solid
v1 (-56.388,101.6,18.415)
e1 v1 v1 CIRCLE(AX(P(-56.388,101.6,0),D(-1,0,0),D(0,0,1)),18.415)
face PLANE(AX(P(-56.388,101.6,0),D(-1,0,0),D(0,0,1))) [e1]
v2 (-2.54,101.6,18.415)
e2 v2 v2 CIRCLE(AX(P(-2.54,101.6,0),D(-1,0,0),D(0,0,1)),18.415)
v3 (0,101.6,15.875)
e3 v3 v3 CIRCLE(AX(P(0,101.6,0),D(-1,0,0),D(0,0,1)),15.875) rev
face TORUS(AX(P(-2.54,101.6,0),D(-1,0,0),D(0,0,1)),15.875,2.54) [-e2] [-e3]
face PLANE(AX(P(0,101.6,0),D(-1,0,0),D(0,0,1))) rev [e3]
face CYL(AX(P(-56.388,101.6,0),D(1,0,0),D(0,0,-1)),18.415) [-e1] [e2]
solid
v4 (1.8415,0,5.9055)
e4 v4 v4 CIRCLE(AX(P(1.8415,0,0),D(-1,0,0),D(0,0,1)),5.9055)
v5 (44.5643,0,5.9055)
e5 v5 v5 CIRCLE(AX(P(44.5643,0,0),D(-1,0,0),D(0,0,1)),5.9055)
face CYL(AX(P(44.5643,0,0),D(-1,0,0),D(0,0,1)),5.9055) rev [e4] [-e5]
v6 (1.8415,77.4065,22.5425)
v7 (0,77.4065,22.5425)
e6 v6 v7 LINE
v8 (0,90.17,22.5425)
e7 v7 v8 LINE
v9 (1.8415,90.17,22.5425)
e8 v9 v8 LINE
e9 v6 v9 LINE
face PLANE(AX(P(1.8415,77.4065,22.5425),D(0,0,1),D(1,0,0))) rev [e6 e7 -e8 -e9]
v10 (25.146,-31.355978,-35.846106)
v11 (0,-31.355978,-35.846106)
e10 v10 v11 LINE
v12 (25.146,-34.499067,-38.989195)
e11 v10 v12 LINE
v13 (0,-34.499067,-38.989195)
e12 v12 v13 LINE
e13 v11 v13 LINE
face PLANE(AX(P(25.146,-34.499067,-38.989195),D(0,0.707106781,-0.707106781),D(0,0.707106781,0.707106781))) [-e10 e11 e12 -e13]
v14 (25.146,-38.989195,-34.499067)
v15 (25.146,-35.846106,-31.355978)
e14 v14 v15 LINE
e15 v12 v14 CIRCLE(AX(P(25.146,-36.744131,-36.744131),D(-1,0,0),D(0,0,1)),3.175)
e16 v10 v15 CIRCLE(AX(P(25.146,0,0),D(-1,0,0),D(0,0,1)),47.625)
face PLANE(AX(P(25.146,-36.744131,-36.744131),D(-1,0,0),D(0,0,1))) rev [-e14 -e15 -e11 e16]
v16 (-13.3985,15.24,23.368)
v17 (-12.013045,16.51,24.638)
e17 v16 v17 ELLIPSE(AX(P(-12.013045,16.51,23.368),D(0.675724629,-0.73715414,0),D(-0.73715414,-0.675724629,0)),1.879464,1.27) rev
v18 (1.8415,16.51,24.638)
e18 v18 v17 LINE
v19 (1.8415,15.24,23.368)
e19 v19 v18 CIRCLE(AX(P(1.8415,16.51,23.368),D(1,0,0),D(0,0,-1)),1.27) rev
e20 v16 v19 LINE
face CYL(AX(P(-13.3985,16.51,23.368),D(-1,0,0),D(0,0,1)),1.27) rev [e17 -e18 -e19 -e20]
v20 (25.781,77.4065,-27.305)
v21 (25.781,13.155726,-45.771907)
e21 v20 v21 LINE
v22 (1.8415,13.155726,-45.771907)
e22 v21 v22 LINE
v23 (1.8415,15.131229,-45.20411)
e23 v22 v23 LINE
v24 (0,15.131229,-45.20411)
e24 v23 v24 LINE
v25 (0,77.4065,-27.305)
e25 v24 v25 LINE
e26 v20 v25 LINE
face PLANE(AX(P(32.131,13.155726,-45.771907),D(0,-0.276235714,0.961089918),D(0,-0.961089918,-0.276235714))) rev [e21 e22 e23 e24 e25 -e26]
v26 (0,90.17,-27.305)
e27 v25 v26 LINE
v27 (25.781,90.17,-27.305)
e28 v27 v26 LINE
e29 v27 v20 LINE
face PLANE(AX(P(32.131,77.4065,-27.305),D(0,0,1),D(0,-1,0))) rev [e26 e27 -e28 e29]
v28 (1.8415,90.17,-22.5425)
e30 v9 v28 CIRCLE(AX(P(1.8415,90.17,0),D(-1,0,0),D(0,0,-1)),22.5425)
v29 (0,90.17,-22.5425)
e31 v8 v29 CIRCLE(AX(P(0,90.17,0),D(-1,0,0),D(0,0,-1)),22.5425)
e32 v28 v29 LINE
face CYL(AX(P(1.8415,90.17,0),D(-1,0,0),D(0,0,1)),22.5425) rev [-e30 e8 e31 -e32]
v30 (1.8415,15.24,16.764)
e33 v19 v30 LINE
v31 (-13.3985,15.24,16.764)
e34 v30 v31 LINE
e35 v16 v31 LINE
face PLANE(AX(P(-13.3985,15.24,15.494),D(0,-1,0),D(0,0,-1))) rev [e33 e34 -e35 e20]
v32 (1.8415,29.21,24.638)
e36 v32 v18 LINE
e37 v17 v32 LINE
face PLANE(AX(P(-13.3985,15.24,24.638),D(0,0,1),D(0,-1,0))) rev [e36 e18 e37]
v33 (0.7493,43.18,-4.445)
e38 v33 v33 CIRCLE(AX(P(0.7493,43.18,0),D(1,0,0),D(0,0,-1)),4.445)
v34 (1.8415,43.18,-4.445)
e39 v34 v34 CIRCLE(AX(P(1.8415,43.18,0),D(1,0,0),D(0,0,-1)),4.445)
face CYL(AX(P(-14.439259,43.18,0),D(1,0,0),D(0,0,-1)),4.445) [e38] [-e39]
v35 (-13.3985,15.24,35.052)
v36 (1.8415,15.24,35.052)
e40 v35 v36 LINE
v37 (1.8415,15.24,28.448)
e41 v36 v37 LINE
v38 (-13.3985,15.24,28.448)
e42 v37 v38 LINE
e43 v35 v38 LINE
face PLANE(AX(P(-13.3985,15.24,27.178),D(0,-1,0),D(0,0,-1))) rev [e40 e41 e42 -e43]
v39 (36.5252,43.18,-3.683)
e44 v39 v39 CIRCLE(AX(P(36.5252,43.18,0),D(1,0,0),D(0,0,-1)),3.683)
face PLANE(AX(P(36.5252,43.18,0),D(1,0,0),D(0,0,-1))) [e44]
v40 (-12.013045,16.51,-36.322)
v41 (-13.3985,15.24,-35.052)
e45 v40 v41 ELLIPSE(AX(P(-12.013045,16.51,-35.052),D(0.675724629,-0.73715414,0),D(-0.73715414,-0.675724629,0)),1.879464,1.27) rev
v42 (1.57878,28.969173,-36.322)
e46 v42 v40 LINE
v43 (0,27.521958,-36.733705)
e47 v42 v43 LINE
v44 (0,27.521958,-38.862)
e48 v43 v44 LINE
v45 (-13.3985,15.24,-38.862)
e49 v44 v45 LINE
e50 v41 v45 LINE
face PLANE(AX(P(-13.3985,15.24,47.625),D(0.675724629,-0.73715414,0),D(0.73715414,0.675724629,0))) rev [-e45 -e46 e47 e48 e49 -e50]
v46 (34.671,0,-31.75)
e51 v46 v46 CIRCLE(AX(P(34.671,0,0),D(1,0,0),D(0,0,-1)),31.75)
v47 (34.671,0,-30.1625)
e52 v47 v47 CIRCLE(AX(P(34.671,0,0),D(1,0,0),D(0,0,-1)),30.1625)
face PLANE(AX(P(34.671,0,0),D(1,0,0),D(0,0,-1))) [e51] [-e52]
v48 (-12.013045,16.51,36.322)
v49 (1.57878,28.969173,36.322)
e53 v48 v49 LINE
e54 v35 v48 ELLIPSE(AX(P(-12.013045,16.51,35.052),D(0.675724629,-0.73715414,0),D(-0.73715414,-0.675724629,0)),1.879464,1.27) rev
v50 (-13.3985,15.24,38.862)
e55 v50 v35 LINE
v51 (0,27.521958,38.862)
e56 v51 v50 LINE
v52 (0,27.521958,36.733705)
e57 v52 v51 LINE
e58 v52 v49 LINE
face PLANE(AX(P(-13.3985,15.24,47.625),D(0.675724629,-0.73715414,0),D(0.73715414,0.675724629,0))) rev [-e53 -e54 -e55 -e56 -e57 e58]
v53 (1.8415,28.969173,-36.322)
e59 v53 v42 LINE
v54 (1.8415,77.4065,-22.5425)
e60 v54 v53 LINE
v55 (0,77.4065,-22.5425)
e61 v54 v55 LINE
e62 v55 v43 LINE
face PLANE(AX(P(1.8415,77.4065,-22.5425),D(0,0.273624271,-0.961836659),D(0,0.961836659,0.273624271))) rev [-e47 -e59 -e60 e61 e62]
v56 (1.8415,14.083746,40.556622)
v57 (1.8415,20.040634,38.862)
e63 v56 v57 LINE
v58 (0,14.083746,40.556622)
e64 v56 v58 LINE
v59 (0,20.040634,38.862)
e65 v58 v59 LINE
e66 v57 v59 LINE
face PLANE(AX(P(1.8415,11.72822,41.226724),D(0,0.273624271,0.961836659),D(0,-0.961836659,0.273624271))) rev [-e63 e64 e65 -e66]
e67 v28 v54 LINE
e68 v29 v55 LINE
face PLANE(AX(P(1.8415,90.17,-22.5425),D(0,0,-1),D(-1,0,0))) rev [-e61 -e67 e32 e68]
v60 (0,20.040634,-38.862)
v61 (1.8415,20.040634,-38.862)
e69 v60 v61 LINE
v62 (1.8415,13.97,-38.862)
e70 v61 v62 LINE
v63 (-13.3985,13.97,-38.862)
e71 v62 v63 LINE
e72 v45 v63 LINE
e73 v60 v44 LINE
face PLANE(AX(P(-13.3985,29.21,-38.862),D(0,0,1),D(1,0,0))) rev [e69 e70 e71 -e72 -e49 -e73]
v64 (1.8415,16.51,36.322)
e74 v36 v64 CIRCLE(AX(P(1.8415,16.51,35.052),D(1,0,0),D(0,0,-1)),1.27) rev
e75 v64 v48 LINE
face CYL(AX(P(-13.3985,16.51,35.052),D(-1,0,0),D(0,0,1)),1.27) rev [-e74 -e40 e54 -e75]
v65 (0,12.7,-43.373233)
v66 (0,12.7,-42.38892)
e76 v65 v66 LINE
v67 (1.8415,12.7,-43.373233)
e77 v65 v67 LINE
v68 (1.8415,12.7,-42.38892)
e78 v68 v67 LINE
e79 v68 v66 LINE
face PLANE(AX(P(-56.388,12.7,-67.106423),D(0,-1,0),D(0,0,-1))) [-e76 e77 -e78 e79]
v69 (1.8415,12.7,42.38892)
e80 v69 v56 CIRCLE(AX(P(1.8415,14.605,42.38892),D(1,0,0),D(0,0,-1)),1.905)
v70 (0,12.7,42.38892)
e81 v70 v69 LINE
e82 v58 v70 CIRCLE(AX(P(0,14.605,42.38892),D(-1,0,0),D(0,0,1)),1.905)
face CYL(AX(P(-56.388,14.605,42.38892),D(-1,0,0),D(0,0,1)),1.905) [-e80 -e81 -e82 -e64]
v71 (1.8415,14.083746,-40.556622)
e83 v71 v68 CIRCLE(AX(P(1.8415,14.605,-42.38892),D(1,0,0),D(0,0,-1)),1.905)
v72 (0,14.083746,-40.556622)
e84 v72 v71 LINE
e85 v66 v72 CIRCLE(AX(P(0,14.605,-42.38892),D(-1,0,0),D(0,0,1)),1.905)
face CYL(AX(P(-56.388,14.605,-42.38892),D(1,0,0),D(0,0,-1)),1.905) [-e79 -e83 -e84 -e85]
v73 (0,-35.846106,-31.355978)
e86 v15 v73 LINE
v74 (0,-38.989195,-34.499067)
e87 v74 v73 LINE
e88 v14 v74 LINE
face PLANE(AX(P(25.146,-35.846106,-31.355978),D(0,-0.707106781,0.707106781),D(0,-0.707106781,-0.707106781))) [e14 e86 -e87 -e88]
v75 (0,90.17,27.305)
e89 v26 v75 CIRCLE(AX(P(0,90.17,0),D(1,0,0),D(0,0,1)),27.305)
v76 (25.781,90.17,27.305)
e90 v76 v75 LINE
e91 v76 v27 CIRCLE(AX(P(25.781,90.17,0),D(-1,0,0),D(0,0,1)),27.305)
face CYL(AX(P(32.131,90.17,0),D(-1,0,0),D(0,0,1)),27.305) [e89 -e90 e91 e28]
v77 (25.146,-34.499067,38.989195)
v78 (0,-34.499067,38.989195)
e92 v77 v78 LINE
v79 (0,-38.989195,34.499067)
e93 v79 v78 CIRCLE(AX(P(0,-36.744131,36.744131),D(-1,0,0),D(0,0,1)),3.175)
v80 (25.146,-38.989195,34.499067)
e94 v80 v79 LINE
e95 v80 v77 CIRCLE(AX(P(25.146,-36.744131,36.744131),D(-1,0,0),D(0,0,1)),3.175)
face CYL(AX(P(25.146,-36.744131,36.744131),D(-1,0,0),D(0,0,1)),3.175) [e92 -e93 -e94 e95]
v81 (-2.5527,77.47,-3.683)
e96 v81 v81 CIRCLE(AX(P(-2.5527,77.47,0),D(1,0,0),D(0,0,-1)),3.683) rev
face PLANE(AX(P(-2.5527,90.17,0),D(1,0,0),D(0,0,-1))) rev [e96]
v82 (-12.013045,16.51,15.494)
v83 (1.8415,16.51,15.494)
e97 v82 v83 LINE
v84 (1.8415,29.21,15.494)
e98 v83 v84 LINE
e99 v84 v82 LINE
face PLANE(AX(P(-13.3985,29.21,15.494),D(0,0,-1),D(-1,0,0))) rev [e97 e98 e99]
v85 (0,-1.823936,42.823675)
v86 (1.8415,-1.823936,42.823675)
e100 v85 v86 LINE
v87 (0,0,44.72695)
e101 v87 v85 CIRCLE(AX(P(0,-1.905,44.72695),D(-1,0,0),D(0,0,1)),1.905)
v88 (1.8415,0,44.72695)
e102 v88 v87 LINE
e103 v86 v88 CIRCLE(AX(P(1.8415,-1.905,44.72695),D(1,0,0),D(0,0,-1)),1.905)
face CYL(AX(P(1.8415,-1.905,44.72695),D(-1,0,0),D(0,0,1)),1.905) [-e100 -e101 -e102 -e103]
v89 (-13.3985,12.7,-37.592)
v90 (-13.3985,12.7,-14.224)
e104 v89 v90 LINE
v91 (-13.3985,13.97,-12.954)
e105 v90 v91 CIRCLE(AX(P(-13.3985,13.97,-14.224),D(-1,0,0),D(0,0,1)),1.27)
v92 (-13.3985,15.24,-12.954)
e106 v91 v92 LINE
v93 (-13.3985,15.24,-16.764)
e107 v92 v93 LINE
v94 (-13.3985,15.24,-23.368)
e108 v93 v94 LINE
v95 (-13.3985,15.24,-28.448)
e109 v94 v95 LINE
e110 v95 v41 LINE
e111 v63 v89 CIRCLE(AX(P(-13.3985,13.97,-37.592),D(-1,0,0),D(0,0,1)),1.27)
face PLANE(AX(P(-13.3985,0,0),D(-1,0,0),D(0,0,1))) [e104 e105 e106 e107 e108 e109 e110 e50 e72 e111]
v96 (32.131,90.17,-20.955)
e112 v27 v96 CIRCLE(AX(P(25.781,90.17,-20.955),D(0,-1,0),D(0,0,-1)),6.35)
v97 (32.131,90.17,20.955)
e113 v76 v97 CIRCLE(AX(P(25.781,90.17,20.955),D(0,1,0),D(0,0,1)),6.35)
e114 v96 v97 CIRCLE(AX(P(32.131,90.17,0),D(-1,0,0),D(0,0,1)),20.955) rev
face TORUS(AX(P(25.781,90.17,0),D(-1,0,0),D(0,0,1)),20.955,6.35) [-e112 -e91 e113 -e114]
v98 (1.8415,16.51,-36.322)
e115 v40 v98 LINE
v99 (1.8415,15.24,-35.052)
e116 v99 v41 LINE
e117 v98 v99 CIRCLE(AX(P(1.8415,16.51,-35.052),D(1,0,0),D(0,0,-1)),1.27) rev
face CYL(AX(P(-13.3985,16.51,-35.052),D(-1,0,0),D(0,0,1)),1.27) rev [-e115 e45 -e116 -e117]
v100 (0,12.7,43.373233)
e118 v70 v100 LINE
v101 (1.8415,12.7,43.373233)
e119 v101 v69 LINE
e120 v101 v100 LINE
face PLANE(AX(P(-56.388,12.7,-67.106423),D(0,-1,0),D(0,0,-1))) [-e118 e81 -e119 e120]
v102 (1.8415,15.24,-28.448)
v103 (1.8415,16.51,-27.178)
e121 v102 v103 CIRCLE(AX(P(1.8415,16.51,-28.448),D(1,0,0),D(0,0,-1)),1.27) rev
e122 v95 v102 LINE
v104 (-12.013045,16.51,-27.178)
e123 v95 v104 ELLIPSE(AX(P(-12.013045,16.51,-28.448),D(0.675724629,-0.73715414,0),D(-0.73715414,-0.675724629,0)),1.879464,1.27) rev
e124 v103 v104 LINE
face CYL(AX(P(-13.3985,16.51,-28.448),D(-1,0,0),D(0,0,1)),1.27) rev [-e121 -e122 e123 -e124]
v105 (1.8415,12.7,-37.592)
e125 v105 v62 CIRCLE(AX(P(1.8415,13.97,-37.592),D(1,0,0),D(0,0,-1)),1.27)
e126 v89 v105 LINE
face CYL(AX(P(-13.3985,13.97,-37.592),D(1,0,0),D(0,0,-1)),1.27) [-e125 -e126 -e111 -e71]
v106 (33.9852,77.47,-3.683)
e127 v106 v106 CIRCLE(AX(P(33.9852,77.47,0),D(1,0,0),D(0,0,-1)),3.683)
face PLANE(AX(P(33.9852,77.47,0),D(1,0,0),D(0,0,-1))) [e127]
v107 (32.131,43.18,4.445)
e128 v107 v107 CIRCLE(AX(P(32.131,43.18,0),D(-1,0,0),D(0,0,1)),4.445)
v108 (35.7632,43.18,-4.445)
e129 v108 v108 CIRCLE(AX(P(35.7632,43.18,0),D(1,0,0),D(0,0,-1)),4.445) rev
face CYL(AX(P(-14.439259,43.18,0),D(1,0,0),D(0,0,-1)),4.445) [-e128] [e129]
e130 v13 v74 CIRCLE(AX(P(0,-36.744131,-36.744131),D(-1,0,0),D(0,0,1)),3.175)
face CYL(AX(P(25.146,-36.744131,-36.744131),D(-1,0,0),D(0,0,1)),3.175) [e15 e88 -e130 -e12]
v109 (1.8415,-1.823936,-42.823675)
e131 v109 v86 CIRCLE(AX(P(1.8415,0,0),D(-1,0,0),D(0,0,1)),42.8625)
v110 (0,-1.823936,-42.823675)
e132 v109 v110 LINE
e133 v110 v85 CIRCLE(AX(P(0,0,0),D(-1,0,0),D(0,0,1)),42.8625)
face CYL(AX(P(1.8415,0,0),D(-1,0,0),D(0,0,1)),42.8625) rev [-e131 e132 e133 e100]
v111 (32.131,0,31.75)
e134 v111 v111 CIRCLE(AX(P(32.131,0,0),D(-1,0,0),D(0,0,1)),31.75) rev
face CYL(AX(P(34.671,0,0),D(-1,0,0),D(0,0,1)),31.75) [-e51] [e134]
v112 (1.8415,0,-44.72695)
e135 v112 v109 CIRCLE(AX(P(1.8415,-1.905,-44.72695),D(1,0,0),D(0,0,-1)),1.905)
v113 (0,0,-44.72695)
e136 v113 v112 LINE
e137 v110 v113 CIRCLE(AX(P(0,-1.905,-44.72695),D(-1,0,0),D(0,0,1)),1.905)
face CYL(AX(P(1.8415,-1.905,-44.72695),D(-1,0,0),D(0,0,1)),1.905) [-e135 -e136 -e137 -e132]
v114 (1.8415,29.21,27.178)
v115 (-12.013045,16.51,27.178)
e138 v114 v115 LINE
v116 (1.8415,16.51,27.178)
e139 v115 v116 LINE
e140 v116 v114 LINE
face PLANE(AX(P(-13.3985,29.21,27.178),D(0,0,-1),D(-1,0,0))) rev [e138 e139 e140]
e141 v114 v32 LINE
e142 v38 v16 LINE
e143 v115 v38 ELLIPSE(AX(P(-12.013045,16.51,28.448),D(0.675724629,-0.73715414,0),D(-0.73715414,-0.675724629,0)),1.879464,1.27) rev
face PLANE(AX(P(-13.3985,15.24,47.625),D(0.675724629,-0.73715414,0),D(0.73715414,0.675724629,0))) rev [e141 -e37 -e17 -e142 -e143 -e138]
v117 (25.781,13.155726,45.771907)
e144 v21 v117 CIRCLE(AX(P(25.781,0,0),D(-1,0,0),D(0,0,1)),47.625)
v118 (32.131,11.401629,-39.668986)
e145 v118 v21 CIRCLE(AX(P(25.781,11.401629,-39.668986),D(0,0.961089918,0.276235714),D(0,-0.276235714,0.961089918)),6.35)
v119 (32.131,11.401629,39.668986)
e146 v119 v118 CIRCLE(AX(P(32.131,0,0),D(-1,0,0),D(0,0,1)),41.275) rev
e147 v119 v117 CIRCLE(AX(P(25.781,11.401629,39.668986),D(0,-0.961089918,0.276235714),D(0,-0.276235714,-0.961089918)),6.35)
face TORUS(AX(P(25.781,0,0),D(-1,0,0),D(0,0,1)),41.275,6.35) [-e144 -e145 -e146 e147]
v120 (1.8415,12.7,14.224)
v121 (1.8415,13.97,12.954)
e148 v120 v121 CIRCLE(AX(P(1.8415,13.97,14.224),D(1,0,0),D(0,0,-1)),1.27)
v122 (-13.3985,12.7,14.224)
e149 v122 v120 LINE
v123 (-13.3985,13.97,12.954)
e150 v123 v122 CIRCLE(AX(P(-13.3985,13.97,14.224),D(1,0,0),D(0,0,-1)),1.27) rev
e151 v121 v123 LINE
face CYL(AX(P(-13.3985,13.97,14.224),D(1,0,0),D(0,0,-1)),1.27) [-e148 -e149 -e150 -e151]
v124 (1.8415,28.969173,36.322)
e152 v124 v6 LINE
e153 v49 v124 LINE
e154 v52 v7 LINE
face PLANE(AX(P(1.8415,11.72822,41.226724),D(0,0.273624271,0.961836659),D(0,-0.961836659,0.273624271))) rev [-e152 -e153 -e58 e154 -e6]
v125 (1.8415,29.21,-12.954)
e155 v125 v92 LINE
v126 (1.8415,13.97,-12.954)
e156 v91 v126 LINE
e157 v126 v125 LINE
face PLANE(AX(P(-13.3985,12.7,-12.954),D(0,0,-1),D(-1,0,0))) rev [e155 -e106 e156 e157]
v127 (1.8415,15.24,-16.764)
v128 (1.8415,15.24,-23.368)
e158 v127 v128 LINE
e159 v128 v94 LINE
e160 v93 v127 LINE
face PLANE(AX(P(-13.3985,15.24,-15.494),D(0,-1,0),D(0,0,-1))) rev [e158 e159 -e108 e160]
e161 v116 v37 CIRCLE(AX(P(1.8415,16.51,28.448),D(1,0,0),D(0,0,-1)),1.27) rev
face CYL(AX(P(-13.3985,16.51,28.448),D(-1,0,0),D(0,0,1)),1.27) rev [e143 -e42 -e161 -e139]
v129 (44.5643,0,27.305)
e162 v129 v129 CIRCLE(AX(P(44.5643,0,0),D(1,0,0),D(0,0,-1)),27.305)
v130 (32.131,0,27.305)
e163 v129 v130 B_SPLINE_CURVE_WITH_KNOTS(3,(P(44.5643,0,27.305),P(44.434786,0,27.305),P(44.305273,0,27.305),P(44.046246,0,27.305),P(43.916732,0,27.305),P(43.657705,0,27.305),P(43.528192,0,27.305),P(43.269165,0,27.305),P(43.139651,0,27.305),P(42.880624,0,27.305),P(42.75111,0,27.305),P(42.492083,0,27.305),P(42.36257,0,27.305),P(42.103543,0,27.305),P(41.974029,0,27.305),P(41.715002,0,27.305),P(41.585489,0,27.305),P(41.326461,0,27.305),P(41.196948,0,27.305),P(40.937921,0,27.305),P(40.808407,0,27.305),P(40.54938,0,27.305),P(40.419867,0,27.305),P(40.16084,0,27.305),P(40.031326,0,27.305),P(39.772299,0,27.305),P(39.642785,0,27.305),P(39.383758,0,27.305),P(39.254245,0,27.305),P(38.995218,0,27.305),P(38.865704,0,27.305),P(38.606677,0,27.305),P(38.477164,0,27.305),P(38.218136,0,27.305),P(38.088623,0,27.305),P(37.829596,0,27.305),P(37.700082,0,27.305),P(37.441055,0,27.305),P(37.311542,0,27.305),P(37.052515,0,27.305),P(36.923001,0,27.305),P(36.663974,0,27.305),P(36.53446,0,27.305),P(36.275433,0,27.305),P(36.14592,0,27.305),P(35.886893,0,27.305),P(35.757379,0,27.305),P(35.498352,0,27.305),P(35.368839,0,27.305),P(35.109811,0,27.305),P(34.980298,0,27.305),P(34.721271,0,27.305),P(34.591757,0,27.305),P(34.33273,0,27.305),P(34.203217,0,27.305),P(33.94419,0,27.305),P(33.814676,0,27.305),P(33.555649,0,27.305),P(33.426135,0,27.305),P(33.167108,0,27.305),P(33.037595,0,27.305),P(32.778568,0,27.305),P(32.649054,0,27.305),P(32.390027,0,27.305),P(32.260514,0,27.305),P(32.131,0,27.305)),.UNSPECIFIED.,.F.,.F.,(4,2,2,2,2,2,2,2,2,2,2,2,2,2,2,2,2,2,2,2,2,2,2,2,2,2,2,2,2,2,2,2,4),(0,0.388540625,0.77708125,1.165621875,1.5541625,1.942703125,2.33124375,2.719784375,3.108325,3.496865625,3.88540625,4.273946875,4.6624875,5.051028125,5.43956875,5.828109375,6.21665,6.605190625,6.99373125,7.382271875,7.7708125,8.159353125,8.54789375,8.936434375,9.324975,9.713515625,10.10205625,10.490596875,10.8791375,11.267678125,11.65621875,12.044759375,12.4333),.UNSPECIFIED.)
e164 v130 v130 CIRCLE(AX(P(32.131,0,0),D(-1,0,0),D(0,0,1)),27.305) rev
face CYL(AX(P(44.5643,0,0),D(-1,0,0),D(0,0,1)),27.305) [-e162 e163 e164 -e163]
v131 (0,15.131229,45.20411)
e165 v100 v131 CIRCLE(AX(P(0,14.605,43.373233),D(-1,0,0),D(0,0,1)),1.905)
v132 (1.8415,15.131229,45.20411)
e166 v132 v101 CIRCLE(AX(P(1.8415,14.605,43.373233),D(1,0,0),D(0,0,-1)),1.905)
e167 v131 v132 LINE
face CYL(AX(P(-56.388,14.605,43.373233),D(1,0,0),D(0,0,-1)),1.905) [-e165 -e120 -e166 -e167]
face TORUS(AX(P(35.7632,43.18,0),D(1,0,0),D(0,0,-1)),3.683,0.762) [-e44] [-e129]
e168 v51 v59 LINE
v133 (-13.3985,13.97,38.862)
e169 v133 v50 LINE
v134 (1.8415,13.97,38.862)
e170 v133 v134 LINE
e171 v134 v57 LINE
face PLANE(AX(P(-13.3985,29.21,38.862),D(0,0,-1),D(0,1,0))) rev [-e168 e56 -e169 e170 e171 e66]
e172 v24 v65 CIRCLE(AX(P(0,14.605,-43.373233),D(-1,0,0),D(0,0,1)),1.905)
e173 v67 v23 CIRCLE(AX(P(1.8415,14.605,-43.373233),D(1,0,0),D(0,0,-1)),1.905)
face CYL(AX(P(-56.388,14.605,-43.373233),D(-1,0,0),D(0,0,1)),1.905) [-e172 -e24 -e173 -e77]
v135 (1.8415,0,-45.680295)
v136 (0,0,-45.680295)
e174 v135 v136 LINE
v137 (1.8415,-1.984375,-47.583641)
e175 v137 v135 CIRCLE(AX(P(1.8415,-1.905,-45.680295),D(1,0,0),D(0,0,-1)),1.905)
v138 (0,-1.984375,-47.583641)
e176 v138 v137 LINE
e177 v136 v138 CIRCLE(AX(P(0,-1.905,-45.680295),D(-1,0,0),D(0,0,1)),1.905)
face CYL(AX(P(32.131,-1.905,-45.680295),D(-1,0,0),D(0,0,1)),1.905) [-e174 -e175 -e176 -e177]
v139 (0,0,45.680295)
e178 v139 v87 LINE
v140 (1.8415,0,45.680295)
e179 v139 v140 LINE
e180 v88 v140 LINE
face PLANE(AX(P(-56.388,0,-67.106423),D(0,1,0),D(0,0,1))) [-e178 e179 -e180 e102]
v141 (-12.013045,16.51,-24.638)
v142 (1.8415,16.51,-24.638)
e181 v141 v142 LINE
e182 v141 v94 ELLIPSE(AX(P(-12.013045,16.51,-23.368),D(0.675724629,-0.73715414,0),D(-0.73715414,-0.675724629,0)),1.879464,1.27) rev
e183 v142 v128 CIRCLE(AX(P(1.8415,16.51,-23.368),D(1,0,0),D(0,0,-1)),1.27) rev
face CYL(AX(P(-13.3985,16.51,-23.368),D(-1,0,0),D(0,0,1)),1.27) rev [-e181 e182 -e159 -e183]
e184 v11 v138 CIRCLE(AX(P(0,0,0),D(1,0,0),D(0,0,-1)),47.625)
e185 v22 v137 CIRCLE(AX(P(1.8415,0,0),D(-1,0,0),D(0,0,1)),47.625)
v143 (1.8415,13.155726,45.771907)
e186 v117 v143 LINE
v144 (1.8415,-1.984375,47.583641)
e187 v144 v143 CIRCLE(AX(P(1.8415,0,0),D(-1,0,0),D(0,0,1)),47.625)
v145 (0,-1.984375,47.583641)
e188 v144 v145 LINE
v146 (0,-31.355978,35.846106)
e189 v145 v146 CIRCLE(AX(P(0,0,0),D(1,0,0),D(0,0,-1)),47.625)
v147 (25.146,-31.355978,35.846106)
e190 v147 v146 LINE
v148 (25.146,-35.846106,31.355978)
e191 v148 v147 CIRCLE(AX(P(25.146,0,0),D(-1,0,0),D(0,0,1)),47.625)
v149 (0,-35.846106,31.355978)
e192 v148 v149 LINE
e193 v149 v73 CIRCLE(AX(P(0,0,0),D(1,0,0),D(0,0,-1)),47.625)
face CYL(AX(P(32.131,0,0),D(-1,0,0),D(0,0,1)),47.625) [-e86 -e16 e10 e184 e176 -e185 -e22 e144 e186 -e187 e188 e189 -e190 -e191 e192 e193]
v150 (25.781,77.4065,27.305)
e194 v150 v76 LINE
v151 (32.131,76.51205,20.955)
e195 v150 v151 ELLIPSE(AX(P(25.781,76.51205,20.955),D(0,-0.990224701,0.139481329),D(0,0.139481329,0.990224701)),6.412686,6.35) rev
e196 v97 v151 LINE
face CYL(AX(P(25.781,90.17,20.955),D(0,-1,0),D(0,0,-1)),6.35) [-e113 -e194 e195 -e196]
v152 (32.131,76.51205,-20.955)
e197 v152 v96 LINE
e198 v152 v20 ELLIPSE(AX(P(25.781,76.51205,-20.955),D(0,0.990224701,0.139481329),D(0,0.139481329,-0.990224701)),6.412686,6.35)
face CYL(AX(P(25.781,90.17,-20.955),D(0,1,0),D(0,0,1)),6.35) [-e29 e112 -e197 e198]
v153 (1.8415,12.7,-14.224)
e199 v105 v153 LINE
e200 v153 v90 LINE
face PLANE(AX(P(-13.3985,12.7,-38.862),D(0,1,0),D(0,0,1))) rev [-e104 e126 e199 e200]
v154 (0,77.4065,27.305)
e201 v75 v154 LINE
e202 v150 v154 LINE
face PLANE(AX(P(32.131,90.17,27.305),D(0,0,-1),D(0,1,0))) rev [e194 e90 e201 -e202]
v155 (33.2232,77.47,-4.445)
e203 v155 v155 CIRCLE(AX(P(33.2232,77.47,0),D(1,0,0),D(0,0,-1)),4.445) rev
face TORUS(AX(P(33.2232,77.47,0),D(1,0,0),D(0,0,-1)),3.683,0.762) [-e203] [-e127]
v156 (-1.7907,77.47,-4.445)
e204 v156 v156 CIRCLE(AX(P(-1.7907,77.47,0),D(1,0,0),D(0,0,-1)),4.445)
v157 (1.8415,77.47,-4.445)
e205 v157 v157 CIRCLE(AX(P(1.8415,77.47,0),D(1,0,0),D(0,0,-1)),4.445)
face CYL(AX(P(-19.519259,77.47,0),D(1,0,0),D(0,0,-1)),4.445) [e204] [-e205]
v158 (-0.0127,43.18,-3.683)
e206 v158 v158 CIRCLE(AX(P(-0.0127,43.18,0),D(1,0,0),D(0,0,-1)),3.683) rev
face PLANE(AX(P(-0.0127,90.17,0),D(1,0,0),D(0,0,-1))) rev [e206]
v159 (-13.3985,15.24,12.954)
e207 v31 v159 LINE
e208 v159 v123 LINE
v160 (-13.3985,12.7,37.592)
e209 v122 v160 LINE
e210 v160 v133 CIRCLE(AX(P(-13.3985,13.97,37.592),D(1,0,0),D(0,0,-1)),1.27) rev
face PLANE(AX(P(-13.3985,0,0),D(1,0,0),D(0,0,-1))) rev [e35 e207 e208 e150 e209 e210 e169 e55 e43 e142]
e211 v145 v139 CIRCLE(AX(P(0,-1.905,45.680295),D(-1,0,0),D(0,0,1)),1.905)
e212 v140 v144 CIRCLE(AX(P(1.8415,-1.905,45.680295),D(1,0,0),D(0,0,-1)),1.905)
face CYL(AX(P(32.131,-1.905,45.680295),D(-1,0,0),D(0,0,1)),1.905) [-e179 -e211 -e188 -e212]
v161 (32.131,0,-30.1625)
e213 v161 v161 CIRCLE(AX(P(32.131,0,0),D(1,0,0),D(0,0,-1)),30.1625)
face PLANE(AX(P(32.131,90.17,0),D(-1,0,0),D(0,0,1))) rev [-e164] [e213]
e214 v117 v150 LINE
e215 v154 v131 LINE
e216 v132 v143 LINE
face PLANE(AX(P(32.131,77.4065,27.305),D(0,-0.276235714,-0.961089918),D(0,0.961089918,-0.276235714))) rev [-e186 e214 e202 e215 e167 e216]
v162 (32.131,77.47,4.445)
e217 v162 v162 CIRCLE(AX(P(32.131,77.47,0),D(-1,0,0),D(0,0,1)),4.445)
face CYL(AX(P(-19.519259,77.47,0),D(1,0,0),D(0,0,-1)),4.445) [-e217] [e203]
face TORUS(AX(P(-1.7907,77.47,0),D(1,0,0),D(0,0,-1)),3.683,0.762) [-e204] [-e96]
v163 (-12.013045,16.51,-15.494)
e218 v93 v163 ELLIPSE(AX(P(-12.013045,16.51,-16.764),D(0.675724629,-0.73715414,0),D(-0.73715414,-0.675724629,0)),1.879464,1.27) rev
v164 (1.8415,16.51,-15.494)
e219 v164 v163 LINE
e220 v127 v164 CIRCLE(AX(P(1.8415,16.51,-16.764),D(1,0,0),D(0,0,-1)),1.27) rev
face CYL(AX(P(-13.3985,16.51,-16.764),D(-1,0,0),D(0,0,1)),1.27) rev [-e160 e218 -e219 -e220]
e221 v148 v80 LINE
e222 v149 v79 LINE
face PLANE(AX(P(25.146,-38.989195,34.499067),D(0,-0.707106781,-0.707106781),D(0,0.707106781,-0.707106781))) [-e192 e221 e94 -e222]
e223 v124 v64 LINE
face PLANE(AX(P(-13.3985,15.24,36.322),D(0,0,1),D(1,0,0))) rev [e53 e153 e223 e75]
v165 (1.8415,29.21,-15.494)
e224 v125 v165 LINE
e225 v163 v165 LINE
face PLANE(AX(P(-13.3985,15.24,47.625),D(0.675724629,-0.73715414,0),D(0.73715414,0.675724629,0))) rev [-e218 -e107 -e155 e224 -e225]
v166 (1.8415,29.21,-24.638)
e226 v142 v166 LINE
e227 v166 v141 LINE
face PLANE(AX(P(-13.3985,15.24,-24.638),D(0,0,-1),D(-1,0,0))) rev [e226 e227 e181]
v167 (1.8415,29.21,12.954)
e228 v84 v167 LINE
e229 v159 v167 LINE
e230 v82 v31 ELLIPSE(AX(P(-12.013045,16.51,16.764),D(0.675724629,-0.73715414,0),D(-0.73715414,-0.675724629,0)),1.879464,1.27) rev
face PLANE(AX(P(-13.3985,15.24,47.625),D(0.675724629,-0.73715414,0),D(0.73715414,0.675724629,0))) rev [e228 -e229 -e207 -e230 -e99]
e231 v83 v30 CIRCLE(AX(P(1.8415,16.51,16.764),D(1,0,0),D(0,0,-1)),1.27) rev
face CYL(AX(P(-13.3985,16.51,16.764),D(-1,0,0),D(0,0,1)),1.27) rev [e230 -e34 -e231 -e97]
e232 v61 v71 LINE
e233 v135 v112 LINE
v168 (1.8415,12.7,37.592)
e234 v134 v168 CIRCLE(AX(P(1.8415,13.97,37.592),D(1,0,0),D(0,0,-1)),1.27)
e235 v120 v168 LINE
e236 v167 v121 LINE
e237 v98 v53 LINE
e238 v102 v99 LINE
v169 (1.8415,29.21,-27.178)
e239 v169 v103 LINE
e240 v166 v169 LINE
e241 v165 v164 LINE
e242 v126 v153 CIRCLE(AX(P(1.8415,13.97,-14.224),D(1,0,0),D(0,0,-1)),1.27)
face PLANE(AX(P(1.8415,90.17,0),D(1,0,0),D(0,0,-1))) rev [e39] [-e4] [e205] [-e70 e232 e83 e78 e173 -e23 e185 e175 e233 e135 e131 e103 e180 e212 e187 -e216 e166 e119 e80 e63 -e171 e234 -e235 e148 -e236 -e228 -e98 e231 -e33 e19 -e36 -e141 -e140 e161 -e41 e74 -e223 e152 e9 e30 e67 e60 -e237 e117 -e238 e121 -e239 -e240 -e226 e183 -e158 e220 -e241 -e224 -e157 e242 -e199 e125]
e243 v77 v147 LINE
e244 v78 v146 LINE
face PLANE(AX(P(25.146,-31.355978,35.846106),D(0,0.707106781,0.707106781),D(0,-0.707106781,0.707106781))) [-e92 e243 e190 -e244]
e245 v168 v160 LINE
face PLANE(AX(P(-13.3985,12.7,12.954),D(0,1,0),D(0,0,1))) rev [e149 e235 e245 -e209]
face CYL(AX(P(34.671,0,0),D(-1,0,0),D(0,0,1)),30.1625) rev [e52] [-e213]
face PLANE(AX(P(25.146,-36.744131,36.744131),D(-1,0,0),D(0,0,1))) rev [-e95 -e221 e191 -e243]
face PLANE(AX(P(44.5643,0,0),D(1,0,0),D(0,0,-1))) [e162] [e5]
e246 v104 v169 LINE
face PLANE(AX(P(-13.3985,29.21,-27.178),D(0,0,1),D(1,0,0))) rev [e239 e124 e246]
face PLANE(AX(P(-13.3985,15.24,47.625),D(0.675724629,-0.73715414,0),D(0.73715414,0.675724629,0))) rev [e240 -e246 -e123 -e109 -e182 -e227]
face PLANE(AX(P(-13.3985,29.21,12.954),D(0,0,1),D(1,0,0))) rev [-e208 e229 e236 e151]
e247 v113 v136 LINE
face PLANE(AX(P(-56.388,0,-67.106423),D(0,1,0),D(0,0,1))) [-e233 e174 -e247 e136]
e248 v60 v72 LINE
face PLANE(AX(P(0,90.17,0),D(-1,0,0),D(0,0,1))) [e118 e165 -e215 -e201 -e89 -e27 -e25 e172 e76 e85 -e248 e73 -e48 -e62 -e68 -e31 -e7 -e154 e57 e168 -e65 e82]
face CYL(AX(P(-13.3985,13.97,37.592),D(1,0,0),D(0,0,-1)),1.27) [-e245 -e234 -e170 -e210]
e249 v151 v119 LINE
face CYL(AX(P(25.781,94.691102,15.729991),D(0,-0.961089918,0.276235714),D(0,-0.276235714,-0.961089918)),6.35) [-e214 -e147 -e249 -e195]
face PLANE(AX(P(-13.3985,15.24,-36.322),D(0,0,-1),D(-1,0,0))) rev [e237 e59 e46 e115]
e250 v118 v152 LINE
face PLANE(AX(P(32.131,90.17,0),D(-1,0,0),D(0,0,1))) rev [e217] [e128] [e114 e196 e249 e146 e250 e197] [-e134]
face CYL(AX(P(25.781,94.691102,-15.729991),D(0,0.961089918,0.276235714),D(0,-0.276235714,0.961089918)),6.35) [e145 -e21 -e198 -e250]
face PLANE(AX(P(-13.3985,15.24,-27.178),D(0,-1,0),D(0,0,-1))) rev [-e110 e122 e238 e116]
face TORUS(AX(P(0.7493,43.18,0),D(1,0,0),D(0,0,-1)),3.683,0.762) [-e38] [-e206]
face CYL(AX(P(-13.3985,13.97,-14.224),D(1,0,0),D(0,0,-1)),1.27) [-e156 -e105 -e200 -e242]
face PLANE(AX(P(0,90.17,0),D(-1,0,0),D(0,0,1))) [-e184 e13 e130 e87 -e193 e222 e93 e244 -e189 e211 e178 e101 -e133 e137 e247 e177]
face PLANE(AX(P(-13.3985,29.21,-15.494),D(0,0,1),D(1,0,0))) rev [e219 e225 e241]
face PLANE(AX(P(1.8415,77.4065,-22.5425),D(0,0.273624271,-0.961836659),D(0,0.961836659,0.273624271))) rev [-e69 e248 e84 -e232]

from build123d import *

# Parameters (mm, degrees)
BOSS_EXTRUDE1_DEPTH      = 32.131
FILLET1_R                = 6.35
CUT_EXTRUDE1_DEPTH       = 1.8415
SKETCH3_R                = 18.414999999999996
BOSS_EXTRUDE2_DEPTH      = 56.388
FILLET2_R                = 2.54
SKETCH4_R                = 31.75
SKETCH4_R_2              = 30.1625
BOSS_EXTRUDE3_DEPTH      = 2.54
SKETCH5_R                = 27.305
BOSS_EXTRUDE4_DEPTH      = 12.4333
BOSS_EXTRUDE5_DEPTH      = 25.145999999999997
BOSS_EXTRUDE6_DEPTH      = 1.8541999999999998
BOSS_EXTRUDE6_DEPTH_BACK = 34.6837
SKETCH7_R                = 4.444999999999999
BOSS_EXTRUDE7_DEPTH      = 4.394199999999999
BOSS_EXTRUDE7_DEPTH_BACK = 32.1437
SKETCH8_R                = 4.444999999999999
FILLET3_R                = 0.762
SKETCH9_R                = 5.9055
CUT_EXTRUDE2_DEPTH       = 142.64185652641663
SKETCH10_W               = 134.21284559698992
SKETCH10_H               = 12.699999999999998
CUT_EXTRUDE3_DEPTH       = 142.64185652641663
FILLET4_R                = 1.905
BOSS_EXTRUDE8_DEPTH      = 15.239999999999998
FILLET5_R                = 1.27
CUT_EXTRUDE4_DEPTH       = 159.3136378774741
BOSS_EXTRUDE9_DEPTH      = 6.35


with BuildPart() as part:
    # Sketch1 → Boss-Extrude1 (new body)
    with BuildSketch(Plane(origin=(0, 0, 0), x_dir=(0, 0, -1), z_dir=(1, 0, 0))):
        with BuildLine():
            Line((-27.305000000000003, 90.17), (-27.305, 77.40650000000001))
            Line((-27.305, 77.40650000000001), (-45.77190734137806, 13.155725876298133))
            ThreePointArc((-45.77190734137806, 13.155725876298133), (-8.75e-15, -47.62499999999999), (45.77190734137806, 13.155725876298133))
            Line((45.77190734137806, 13.155725876298133), (27.305, 77.40650000000001))
            Line((27.305, 77.40650000000001), (27.305000000000003, 90.17))
            ThreePointArc((27.305000000000003, 90.17), (1.67e-15, 117.47500000000001), (-27.305000000000003, 90.17))
        make_face()
    extrude(amount=BOSS_EXTRUDE1_DEPTH)

    # Fillet1
    fillet1_edges = [part.edges().sort_by_distance(p)[0] for p in [
        (32.131, 45.28111293814907, 36.53845367068903),
        (32.131, -47.62499999999999, 8.88e-15),
        (32.131, 45.28111293814907, -36.53845367068903),
        (32.131, 83.78825, -27.305),
        (32.131, 117.47500000000001, -1.67e-15),
        (32.131, 83.78825, 27.305),
    ]]
    fillet(fillet1_edges, radius=FILLET1_R)

    # Sketch2 → Cut-Extrude1 (cut)
    with BuildSketch(Plane.ZY):
        with BuildLine():
            Line((-22.542499999999997, 90.17), (-22.542499999999997, 77.40650000000001))
            Line((-22.542499999999997, 77.40650000000001), (-41.22672379287508, 11.72822030642276))
            ThreePointArc((-41.22672379287508, 11.72822030642276), (-7.87e-15, -42.86249999999999), (41.22672379287508, 11.72822030642276))
            Line((41.22672379287508, 11.72822030642276), (22.542499999999997, 77.4065))
            Line((22.542499999999997, 77.4065), (22.542499999999997, 90.17))
            ThreePointArc((22.542499999999997, 90.17), (1.38e-15, 112.7125), (-22.542499999999997, 90.17))
        make_face()
    extrude(amount=-CUT_EXTRUDE1_DEPTH, mode=Mode.SUBTRACT)

    # Sketch4 → Boss-Extrude3 (add)
    with BuildSketch(Plane(origin=(32.131, 0, 0), x_dir=(0, 0, -1), z_dir=(1, 0, 0))):
        with Locations(Location((0, 0, 0), (0, 0, 180))):
            Circle(SKETCH4_R)
        Circle(SKETCH4_R_2, mode=Mode.SUBTRACT)
    extrude(amount=BOSS_EXTRUDE3_DEPTH)

    # Sketch5 → Boss-Extrude4 (add)
    with BuildSketch(Plane(origin=(32.131, 0, 0), x_dir=(0, 0, -1), z_dir=(1, 0, 0))):
        with Locations(Location((0, 0, 0), (0, 0, 180))):
            Circle(SKETCH5_R)
    extrude(amount=BOSS_EXTRUDE4_DEPTH)

    # Sketch6 → Boss-Extrude5 (add)
    with BuildSketch(Plane.ZY):
        with BuildLine():
            Line((34.49906726262701, -38.989195323161965), (31.355977620252823, -35.84610568078774))
            Line((31.355977620252823, -35.84610568078774), (35.84610568078741, -31.35597762025319))
            Line((35.84610568078741, -31.35597762025319), (38.9891953231616, -34.49906726262742))
            ThreePointArc((38.9891953231616, -34.49906726262742), (38.989195323161574, -38.98919532316199), (34.49906726262701, -38.989195323161965))
        make_face()
        with BuildLine():
            Line((-38.98919532316209, -34.49906726262692), (-35.84610568078783, -31.35597762025271))
            Line((-35.84610568078783, -31.35597762025271), (-31.35597762025329, -35.846105680787325))
            Line((-31.35597762025329, -35.846105680787325), (-34.499067262627555, -38.98919532316154))
            ThreePointArc((-34.499067262627555, -38.98919532316154), (-38.98919532316211, -38.9891953231614), (-38.98919532316209, -34.49906726262692))
        make_face()
    extrude(amount=-BOSS_EXTRUDE5_DEPTH)

    # Sketch7 → Boss-Extrude6 (add, two sides: drawn at the far end of the back side and taken through both)
    with BuildSketch(Plane(origin=(32.131, 0, 0), x_dir=(0, 0, -1), z_dir=(1, 0, 0)).offset(-BOSS_EXTRUDE6_DEPTH_BACK)):
        with Locations((0, 77.47000000000001)):
            Circle(SKETCH7_R)
    extrude(amount=BOSS_EXTRUDE6_DEPTH + BOSS_EXTRUDE6_DEPTH_BACK)

    # Sketch8 → Boss-Extrude7 (add, two sides: drawn at the far end of the back side and taken through both)
    with BuildSketch(Plane(origin=(32.131, 0, 0), x_dir=(0, 0, -1), z_dir=(1, 0, 0)).offset(-BOSS_EXTRUDE7_DEPTH_BACK)):
        with Locations((0, 43.18000000000001)):
            Circle(SKETCH8_R)
    extrude(amount=BOSS_EXTRUDE7_DEPTH + BOSS_EXTRUDE7_DEPTH_BACK)

    # Fillet3
    fillet3_edges = [part.edges().sort_by_distance(p)[0] for p in [
        (-2.5527000000000015, 77.47000000000001, 4.444999999999999),
        (33.9852, 77.47000000000001, 4.444999999999999),
        (-0.01270000000000238, 43.18000000000001, 4.444999999999999),
        (36.5252, 43.18000000000001, 4.444999999999999),
    ]]
    fillet(fillet3_edges, radius=FILLET3_R)

    # Sketch9 → Cut-Extrude2 (cut, through all)
    with BuildSketch(Plane.ZY.offset(-1.8415)):
        Circle(SKETCH9_R)
    extrude(amount=-CUT_EXTRUDE2_DEPTH, mode=Mode.SUBTRACT)

    # Sketch10 → Cut-Extrude3 (cut, through all)
    with BuildSketch(Plane.ZY.offset(-1.8415)):
        with Locations((0, 6.349999999999999)):
            Rectangle(SKETCH10_W, SKETCH10_H)
    extrude(amount=CUT_EXTRUDE3_DEPTH, mode=Mode.SUBTRACT)

    # Fillet4
    # the kernel refuses this fillet: 1.905 mm, written as the material it takes off along each edge
    with BuildSketch(Plane(origin=(1.8415, 0, -47.624999999999986), x_dir=(0, -0.9997828682661093, 0.020837857893547872), z_dir=(-1, 0, 0))) as fillet4_piece_1:
        with BuildLine():
            CenterArc((1.9451098450732716, 1.9045863640469403), FILLET4_R, 178.80599226836884, 92.38801546326556)
            Line((0.04052348102633122, 1.9442824833340424), (0, 0))
            ThreePointArc((0, 0), (0.9924029821802466, -0.01034089882655586), (1.984805964360482, 0))
        make_face()
    extrude(amount=6.803514910901205, mode=Mode.SUBTRACT)
    with BuildSketch(Plane(origin=(1.8415, 0, -42.86249999999998), x_dir=(0, 0, -1), z_dir=(-1, 0, 0))) as fillet4_piece_2:
        with BuildLine():
            CenterArc((1.8644497199396994, 1.9049999999999998), FILLET4_R, 182.43885469094968, 87.56114530905029)
            ThreePointArc((-0.03882473622794436, 1.8239361702127719), (-0.0097072832853442, 0.9121746698348945), (0, 0))
            Line((0, 0), (1.8644497199396994, 0))
        make_face()
    extrude(amount=6.5026242998492485, mode=Mode.SUBTRACT)
    with BuildSketch(Plane(origin=(1.8415, 0, 42.8625), x_dir=(0, -0.9997735250327126, -0.021281415452547647), z_dir=(-1, 0, 0))) as fillet4_piece_3:
        with BuildLine():
            CenterArc((1.8648904361068899, 1.9045685651873139), FILLET4_R, 181.2194273454691, 87.56114530905586)
            Line((-0.03967812908043138, 1.8640274687504024), (0, 0))
            ThreePointArc((0, 0), (0.9121746698348924, 0.00970728328536713), (1.8243493396697803, 0))
        make_face()
    extrude(amount=6.502624299849337, mode=Mode.SUBTRACT)
    with BuildSketch(Plane(origin=(1.8415, 0, 47.625), x_dir=(0, -0.9997828682661093, -0.02083785789354795), z_dir=(-1, 0, 0))) as fillet4_piece_4:
        with BuildLine():
            CenterArc((1.945109845073265, -1.9045863640469403), FILLET4_R, 88.8059922683656, 92.3880154632651)
            Line((0.04052348102632441, -1.9442824833340282), (0, 0))
            ThreePointArc((0, 0), (0.9924029821802345, 0.01034089882654147), (1.984805964360475, 0))
        make_face()
    extrude(amount=6.803514910901187, mode=Mode.SUBTRACT)
    with BuildSketch(Plane(origin=(1.8415, 12.7, 45.90044253599305), x_dir=(0, 0, -1), z_dir=(-1, 0, 0))) as fillet4_piece_5:
        with BuildLine():
            CenterArc((2.5272090639859783, -1.9049999999999994), FILLET4_R, 90, 106.03566818225914)
            Line((0.696332770330855, -2.431229035051931), (0.5132451409653456, -2.483851938557125))
            ThreePointArc((0.5132451409653456, -2.483851938557125), (-0.0545524347505264, -0.5083487798033133), (-0.18360177014397294, -0.05080000000000062))
            Line((-0.18360177014397294, -0.05080000000000062), (0, 0.1905000000000001))
            Line((0, 0.1905000000000001), (2.5272090639859783, 0.1905000000000001))
            Line((2.5272090639859783, 0.1905000000000001), (2.5272090639859783, 0))
        make_face()
    extrude(amount=8.163956972924069, mode=Mode.SUBTRACT)
    with BuildSketch(Plane(origin=(1.8415, 12.7, 40.95027091748187), x_dir=(0, 0, 1), z_dir=(-1, 0, 0))) as fillet4_piece_6:
        with BuildLine():
            CenterArc((FILLET4_R * 0.755196552848, FILLET4_R), FILLET4_R, 195.8800464533219, 74.11995354667806)
            Line((-FILLET4_R * 0.206640106071, FILLET4_R * 0.726375729217), (0, 0))
            Line((0, 0), (FILLET4_R * 0.755196552848, 0))
        make_face()
    extrude(amount=5.438123582936443, mode=Mode.SUBTRACT)
    with BuildSketch(Plane(origin=(-3.596623582936438, 12.700000000000003, -40.950270917481866), x_dir=(0, 0.9618366589180548, 0.27362427078268), z_dir=(1, 0, 0))) as fillet4_piece_7:
        with BuildLine():
            CenterArc((FILLET4_R * 0.755196552848, -FILLET4_R), FILLET4_R, 90.00000000000018, 74.11995354667768)
            Line((-FILLET4_R * 0.206640106071, -FILLET4_R * 0.726375729217), (0, 0))
            Line((0, 0), (FILLET4_R * 0.755196552848, 4e-17))
        make_face()
    extrude(amount=5.438123582936438, mode=Mode.SUBTRACT)
    with BuildSketch(Plane(origin=(1.8415, 12.7, -45.90044253599304), x_dir=(0, 0, 1), z_dir=(-1, 0, 0))) as fillet4_piece_8:
        with BuildLine():
            CenterArc((2.5272090639859712, 1.9049999999999994), FILLET4_R, 163.96433181774108, 106.03566818225892)
            Line((0.696332770330848, 2.431229035051924), (0.5132451409653385, 2.483851938557116))
            ThreePointArc((0.5132451409653385, 2.483851938557116), (-0.05455243475053351, 0.5083487798033257), (-0.18360177014397294, 0.05080000000000062))
            Line((-0.18360177014397294, 0.05080000000000062), (0, -0.1905000000000001))
            Line((0, -0.1905000000000001), (2.5272090639859712, -0.1905000000000001))
            Line((2.5272090639859712, -0.1905000000000001), (2.5272090639859712, 0))
        make_face()
    extrude(amount=8.163956972924046, mode=Mode.SUBTRACT)

    # Sketch11 → Boss-Extrude8 (add)
    with BuildSketch(Plane.ZY.offset(-1.8415)):
        Polygon((-38.862, 12.7), (-12.954, 12.7), (-12.954, 29.21), (-15.494000000000002, 29.21), (-15.494000000000002, 15.239999999999998), (-24.638, 15.239999999999998), (-24.638, 29.21), (-27.178, 29.21), (-27.178, 15.239999999999998), (-36.322, 15.239999999999998), (-36.322, 29.21), (-38.862, 29.21), align=None)
        Polygon((12.954, 29.21), (12.954, 12.7), (38.862, 12.700000000000001), (38.861999999999995, 29.21), (36.322, 29.21), (36.322, 15.239999999999998), (27.178000000000004, 15.239999999999998), (27.178000000000004, 29.21), (24.63800000000001, 29.21), (24.638000000000005, 15.239999999999998), (15.494000000000007, 15.239999999999998), (15.494000000000007, 29.21), align=None)
    extrude(amount=BOSS_EXTRUDE8_DEPTH)

    # Fillet5
    fillet5_edges = [part.edges().sort_by_distance(p)[0] for p in [
        (-5.778499999999999, 12.7, -38.862),
        (-5.778499999999999, 12.7, -12.954),
        (-5.778499999999999, 15.239999999999998, -15.494000000000002),
        (-5.778499999999999, 15.239999999999998, -24.638),
        (-5.778499999999999, 15.239999999999998, -27.178),
        (-5.778499999999999, 15.239999999999998, -36.322),
        (-5.778499999999999, 12.7, 12.954),
        (-5.778499999999999, 12.700000000000001, 38.862),
        (-5.778499999999999, 15.239999999999998, 36.322),
        (-5.778499999999999, 15.239999999999998, 27.178000000000004),
        (-5.778499999999999, 15.239999999999998, 24.638000000000005),
        (-5.778499999999999, 15.239999999999998, 15.494000000000007),
    ]]
    fillet(fillet5_edges, radius=FILLET5_R)

    # Sketch12 → Cut-Extrude4 (cut, through all)
    with BuildSketch(Plane(origin=(0, 0, -38.862), x_dir=(-1, 0, 0), z_dir=(0, 0, -1))):
        Polygon((13.398499999999999, 15.24), (-1.8415, 29.21), (13.398499999999999, 29.21), align=None)
    extrude(amount=-CUT_EXTRUDE4_DEPTH, mode=Mode.SUBTRACT)

    # Sketch13 → Boss-Extrude9 (add)
    with BuildSketch(Plane.ZY):
        Polygon((-36.253489329115546, 29.21), (-38.861999999999995, 20.040633623037603), (-38.862, 29.21), align=None)
        Polygon((36.25348932911554, 29.21), (38.862, 20.04063362303758), (38.861999999999995, 27.52195833333334), (41.64277602355167, 27.52195833333334), (41.157600405485155, 29.21), align=None)
    extrude(amount=-BOSS_EXTRUDE9_DEPTH)


with BuildPart() as body_2:
    # Sketch3 → Boss-Extrude2 (new body)
    with BuildSketch(Plane.ZY):
        with Locations((0, 101.6)):
            Circle(SKETCH3_R)
    extrude(amount=BOSS_EXTRUDE2_DEPTH)

    # Fillet2
    fillet2_edges = [body_2.edges().sort_by_distance(p)[0] for p in [
        (0, 101.6, -18.414999999999996),
    ]]
    fillet(fillet2_edges, radius=FILLET2_R)


solid = Compound([part.part, body_2.part])
